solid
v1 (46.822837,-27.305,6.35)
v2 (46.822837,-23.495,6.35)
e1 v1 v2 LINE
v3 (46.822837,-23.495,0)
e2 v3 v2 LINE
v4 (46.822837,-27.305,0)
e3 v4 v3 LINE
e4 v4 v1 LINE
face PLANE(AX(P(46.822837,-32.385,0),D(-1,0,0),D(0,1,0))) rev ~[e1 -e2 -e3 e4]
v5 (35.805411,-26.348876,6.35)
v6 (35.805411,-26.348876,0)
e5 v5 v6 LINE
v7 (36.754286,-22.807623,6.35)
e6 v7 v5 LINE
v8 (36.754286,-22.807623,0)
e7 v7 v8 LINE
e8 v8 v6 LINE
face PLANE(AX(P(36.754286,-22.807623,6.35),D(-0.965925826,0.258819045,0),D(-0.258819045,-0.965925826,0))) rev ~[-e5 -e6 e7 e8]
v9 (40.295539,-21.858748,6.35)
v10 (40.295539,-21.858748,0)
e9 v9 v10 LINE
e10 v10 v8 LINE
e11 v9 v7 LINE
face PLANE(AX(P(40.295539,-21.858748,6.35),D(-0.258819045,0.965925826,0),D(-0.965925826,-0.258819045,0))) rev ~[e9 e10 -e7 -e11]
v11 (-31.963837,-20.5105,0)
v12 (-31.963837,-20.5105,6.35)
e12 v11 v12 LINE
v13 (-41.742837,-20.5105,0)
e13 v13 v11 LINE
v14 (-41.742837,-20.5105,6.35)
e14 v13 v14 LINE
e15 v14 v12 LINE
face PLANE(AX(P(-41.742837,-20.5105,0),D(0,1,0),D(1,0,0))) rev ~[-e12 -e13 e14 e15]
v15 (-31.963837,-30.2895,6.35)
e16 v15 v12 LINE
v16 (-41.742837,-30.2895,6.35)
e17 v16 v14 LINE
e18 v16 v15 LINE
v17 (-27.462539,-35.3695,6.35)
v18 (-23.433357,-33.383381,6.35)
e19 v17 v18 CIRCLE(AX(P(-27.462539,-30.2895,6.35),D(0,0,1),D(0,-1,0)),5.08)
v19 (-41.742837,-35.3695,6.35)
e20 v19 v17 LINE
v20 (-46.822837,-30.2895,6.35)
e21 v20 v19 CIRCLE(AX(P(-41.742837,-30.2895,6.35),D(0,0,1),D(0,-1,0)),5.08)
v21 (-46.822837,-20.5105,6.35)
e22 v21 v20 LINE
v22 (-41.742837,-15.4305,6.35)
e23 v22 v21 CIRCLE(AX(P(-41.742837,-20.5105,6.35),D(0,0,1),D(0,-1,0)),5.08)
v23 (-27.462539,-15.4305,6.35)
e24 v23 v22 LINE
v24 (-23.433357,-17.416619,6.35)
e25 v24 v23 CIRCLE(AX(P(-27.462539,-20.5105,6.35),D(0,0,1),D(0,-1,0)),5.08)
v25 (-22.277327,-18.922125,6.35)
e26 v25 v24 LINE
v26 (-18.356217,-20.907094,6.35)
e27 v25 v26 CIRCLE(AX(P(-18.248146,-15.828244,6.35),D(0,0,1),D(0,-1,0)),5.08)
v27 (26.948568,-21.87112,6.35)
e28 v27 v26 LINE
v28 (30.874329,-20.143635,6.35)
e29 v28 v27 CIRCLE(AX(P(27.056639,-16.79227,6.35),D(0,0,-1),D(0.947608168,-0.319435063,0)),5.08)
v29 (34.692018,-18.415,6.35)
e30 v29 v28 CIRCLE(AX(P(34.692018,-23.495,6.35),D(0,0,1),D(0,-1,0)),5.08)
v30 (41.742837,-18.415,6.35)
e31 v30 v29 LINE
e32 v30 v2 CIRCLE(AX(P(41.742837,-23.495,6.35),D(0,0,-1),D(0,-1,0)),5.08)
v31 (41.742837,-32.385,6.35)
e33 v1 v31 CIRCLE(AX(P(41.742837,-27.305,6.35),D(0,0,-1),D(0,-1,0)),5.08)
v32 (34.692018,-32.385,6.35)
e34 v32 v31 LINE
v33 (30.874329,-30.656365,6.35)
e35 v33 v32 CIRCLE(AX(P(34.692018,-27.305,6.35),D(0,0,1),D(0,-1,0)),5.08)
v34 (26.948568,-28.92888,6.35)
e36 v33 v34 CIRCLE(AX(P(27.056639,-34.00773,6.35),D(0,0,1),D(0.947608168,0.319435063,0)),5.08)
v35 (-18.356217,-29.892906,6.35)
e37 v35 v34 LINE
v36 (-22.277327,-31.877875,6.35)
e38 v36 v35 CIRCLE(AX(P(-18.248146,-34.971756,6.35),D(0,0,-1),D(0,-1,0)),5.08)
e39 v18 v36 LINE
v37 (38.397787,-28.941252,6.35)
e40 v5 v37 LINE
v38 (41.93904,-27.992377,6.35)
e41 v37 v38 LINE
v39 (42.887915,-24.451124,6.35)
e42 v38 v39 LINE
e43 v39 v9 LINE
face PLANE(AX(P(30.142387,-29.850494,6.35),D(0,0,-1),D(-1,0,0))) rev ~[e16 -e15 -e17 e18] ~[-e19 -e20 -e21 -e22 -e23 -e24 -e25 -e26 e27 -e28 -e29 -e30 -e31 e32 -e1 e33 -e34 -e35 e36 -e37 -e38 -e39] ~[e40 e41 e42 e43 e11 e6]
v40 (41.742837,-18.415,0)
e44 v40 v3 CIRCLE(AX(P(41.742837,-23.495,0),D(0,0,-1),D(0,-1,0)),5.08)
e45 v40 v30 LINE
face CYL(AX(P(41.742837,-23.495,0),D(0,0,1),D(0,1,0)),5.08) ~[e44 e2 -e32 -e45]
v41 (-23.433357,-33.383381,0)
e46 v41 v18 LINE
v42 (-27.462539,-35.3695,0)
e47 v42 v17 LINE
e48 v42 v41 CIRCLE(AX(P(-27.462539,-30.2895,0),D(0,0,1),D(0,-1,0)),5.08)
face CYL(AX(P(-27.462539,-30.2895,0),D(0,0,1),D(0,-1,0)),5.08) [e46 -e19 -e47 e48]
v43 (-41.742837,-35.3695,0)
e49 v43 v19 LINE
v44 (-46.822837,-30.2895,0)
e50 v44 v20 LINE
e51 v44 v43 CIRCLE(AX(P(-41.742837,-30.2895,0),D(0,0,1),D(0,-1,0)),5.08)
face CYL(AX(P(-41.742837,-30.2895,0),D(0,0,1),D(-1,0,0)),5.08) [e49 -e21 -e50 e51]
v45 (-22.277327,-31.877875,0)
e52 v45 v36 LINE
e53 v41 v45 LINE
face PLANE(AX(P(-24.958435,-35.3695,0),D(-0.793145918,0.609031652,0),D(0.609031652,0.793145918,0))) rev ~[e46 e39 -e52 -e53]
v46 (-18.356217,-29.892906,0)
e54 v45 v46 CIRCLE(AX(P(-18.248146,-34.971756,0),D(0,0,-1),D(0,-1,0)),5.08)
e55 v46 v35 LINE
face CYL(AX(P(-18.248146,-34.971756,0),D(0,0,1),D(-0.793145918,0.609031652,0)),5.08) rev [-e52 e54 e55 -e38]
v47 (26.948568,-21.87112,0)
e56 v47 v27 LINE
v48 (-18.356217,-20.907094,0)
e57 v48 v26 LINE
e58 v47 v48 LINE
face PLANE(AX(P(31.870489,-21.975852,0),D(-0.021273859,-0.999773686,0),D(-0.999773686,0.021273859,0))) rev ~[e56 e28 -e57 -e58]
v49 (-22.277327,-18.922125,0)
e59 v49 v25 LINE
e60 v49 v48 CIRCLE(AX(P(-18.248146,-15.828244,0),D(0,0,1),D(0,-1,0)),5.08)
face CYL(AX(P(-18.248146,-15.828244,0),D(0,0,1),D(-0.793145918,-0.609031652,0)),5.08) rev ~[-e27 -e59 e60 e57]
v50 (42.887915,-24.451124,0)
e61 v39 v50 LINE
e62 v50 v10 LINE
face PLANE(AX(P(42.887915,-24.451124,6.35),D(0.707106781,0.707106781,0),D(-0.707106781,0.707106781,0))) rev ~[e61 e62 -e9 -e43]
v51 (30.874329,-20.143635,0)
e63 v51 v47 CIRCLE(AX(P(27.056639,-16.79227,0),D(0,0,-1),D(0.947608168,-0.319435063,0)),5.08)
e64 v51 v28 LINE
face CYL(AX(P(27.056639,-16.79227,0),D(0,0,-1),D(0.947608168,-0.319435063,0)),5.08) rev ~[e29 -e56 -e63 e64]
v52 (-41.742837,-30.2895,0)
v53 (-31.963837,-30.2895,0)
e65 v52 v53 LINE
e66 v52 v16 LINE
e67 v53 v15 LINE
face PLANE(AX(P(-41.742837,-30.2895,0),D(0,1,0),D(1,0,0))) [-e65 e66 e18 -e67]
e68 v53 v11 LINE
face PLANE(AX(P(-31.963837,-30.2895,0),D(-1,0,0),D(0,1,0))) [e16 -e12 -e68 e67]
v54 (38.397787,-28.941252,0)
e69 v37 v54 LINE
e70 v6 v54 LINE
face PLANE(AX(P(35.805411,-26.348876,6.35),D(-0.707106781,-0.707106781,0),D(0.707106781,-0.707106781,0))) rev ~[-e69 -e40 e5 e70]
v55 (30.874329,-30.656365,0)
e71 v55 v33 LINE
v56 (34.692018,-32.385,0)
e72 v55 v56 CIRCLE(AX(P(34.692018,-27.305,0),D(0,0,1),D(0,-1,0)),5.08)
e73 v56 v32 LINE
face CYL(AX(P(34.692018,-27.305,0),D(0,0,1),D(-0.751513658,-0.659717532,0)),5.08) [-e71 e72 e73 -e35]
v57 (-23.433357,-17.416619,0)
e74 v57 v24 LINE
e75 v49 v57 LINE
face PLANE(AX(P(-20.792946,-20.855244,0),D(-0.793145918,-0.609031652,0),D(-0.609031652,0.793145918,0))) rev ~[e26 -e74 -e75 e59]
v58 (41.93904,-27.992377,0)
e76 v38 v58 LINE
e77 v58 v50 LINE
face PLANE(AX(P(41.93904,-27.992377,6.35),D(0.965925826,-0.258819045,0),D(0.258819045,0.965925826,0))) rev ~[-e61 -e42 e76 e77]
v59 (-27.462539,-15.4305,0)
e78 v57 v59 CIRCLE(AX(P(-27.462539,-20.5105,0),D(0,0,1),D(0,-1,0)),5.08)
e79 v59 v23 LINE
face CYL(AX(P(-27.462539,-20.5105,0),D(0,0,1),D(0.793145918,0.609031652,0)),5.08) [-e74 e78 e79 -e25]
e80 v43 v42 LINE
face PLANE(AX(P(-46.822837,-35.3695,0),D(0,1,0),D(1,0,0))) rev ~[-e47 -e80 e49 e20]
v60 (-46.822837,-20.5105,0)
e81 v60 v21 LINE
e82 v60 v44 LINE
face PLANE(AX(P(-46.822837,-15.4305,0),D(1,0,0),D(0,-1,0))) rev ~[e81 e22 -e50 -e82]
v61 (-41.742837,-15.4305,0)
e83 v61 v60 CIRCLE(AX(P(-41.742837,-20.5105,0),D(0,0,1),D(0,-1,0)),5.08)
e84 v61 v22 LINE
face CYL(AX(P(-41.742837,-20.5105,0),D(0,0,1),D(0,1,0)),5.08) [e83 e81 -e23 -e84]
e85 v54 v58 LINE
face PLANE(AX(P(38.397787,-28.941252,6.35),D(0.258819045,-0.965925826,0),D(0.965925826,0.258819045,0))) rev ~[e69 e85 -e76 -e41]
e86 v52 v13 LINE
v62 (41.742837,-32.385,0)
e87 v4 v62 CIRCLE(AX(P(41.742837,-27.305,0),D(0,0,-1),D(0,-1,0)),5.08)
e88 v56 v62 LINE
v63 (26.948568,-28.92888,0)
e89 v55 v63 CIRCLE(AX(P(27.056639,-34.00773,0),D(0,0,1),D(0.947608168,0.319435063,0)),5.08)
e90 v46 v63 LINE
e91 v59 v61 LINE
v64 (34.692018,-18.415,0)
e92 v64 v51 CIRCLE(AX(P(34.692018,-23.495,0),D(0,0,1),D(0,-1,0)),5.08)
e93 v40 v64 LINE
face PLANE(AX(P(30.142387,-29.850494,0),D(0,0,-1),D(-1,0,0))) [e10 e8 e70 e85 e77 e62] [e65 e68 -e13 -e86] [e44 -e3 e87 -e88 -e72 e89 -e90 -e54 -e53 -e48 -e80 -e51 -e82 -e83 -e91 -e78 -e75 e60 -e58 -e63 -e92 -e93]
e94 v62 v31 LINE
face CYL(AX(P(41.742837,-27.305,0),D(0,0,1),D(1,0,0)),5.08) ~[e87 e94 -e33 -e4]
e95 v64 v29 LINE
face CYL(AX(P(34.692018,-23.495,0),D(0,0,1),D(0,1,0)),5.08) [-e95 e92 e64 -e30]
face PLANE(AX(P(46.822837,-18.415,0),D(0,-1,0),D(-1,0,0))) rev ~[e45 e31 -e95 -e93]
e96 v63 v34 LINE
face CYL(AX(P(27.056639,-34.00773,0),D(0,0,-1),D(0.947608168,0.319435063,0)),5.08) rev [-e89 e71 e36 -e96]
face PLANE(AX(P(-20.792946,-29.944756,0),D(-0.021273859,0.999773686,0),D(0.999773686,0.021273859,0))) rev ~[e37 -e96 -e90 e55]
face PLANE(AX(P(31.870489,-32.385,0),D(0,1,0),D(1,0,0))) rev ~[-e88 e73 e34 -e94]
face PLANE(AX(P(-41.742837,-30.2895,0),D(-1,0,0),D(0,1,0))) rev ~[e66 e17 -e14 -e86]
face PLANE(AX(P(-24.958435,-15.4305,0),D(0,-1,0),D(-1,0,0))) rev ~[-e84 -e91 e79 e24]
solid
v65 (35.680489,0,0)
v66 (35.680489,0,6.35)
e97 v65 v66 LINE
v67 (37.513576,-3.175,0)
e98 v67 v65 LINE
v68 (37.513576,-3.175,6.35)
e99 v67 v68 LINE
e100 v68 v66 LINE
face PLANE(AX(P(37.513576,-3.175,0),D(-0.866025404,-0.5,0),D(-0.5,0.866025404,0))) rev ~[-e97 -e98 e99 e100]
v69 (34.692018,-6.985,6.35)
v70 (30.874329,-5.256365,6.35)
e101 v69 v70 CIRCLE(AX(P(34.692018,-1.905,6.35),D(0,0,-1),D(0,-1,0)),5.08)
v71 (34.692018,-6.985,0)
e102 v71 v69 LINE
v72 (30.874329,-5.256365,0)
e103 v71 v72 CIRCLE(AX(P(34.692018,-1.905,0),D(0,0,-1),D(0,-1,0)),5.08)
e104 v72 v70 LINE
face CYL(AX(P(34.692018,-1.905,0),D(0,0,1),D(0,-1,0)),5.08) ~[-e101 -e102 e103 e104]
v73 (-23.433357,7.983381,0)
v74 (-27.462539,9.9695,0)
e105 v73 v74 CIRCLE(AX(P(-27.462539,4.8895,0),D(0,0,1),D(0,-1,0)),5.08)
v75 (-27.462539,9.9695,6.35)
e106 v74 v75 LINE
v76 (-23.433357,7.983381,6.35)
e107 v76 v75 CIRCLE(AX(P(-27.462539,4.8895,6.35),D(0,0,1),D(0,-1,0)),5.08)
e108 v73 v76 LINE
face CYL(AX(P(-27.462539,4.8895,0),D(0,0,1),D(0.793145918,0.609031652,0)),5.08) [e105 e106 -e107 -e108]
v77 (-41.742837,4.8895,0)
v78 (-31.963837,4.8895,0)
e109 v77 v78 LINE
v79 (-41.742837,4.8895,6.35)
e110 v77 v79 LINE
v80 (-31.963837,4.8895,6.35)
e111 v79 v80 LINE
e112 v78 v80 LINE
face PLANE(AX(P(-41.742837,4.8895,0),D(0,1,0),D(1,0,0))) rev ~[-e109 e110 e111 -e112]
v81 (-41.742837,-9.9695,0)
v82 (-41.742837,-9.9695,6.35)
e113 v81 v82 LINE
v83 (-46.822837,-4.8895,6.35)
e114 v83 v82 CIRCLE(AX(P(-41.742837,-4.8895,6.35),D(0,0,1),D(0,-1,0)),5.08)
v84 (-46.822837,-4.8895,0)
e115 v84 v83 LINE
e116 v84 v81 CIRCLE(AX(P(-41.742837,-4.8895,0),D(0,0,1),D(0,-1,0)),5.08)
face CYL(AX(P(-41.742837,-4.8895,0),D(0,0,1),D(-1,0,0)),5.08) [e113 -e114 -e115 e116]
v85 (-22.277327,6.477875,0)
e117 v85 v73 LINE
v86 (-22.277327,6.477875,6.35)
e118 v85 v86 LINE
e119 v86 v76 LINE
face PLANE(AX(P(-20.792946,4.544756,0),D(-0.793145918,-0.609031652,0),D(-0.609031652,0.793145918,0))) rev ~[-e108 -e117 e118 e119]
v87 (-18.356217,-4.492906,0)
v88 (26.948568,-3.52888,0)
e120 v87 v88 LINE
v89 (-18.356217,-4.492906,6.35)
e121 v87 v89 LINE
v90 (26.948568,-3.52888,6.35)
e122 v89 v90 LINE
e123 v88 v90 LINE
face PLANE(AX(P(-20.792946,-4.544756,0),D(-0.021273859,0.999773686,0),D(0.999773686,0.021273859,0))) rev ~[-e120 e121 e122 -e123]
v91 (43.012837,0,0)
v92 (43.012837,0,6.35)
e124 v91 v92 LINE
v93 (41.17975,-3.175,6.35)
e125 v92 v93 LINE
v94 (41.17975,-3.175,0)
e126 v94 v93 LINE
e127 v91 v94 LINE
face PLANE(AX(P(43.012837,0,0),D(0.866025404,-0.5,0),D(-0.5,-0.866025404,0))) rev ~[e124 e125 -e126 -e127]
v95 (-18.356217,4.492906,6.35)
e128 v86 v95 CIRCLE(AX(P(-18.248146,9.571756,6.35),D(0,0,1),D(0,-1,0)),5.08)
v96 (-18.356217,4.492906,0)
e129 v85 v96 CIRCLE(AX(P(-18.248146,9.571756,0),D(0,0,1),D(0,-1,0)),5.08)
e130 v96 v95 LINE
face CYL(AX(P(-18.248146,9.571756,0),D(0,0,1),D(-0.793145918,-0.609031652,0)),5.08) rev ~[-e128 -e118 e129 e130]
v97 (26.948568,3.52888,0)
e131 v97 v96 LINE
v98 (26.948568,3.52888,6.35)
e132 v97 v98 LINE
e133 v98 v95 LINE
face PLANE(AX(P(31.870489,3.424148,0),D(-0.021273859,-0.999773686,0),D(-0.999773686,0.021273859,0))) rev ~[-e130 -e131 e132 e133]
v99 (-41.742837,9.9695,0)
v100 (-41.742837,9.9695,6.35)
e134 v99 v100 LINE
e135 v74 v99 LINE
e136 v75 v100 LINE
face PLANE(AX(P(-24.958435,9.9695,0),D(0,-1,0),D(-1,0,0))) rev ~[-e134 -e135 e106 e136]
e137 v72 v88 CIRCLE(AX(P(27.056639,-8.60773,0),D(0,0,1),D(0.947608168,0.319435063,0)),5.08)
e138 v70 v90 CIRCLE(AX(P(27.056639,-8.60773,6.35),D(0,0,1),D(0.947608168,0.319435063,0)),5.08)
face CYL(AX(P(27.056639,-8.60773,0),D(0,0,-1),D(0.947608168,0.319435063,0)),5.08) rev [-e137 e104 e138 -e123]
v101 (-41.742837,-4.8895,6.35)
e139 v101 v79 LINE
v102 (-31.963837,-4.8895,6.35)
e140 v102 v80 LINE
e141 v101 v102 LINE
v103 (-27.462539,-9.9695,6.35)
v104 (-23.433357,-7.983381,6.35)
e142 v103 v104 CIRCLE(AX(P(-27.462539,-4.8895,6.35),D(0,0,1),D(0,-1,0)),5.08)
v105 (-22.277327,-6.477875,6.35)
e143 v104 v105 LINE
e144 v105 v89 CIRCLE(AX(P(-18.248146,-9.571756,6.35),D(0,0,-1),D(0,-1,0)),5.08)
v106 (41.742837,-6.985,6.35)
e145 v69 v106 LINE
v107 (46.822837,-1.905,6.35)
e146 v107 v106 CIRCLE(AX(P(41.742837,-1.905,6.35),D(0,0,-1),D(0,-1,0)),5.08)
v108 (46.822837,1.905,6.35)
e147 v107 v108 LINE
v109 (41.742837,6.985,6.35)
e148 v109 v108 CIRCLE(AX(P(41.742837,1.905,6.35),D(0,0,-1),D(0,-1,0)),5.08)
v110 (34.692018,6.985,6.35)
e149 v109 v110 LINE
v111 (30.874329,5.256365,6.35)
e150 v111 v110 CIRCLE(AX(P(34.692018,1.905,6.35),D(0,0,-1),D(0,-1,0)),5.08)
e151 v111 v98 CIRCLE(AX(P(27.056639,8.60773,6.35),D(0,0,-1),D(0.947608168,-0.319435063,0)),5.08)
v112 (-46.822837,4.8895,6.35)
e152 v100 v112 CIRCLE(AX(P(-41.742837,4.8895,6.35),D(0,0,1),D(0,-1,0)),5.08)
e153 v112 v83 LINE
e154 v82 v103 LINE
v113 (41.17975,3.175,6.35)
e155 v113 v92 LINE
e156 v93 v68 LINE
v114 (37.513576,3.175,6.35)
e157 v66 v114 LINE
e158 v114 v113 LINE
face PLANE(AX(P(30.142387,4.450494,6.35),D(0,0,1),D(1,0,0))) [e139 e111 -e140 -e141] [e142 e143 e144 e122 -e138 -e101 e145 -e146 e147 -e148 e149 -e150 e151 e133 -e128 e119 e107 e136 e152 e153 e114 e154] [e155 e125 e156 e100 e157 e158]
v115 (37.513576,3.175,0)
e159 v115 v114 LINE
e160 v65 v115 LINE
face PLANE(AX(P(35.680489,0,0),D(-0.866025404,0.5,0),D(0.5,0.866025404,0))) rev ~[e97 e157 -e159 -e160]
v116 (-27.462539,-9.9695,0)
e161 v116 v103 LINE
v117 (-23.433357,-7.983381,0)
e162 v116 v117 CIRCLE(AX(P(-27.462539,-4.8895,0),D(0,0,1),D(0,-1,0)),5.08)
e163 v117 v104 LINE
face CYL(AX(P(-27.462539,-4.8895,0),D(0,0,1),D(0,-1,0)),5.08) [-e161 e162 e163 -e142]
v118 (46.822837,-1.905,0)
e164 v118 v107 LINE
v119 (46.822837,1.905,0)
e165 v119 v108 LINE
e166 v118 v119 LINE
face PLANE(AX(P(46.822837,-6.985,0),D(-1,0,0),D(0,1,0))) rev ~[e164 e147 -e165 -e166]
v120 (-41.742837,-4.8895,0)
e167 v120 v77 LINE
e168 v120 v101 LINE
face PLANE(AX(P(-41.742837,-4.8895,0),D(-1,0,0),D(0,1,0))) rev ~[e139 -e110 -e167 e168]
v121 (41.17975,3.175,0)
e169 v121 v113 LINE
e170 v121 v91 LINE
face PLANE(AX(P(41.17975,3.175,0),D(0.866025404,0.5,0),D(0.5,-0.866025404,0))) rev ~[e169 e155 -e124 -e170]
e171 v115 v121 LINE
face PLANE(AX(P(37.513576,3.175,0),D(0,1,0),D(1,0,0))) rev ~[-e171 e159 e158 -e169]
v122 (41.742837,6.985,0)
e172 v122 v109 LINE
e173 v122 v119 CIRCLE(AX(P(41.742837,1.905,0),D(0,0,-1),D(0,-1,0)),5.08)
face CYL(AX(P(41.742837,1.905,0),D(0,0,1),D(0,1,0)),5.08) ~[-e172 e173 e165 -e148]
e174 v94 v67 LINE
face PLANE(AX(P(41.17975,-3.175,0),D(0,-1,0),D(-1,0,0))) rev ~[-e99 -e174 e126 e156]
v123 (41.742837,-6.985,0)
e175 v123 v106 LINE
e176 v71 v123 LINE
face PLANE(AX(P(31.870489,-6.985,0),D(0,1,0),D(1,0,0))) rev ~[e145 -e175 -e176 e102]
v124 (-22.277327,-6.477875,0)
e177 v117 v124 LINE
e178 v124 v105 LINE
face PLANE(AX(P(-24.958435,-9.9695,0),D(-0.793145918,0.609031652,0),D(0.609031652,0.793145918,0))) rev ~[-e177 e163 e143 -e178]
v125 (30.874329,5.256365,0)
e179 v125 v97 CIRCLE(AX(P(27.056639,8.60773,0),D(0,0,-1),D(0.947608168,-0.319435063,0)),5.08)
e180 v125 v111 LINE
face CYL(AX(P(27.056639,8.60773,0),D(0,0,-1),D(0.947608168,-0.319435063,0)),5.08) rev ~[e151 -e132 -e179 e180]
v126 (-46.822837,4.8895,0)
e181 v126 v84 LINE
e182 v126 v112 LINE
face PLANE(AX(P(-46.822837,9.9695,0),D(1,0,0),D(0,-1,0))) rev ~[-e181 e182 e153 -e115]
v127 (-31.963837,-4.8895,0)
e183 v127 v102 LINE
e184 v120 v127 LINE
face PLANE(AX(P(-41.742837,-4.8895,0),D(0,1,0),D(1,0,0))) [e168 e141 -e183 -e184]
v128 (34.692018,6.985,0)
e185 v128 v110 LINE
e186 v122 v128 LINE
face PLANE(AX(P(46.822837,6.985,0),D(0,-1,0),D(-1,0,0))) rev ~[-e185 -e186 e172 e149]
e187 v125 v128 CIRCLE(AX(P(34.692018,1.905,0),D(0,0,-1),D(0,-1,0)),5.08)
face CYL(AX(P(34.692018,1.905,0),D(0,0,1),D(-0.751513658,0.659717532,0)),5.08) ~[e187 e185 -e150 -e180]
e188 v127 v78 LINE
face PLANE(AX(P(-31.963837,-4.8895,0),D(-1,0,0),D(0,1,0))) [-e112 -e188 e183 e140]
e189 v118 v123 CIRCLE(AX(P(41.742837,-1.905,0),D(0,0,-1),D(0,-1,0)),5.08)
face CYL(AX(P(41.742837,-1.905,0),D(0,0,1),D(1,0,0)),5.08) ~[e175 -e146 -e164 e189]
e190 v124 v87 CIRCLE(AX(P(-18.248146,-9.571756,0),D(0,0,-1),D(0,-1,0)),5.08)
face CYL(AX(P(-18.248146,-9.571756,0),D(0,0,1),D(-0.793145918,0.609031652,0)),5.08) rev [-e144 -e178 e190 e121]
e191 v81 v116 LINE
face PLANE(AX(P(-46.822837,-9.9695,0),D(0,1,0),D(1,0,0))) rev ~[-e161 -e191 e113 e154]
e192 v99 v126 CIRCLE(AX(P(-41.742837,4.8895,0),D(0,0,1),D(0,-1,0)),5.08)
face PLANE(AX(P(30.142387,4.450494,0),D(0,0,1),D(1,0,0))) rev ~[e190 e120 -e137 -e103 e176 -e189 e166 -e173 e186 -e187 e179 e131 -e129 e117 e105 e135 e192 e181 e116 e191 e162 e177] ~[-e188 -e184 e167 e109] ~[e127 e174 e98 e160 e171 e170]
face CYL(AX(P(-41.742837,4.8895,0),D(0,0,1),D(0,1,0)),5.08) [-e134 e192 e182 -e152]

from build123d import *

# Parameters (mm, degrees)
F0_W         = 9.779
F0_H         = 9.779
F1_DEPTH     = 6.35
F2_R         = 5.08
F7_DEPTH     = 6.35
F9_DEPTH     = 25.4
F10_T1_DEPTH = 6.35
F11_R        = 5.08
F12_T1_DEPTH = 6.35
F13_R        = 5.08


# Not quite as in the source:
# - a fillet or chamfer that OpenCascade refuses, or shapes differently, is made with other operations: its cross-section is extruded or revolved along the edge and cut away or added


with BuildPart() as f1:
    # F0 (on Top) → F1 (new body)
    with BuildSketch(Plane.XY):
        Polygon((-20.7929461649, 4.5447559669), (-24.958435446, 9.9695), (-46.8228371047, 9.9695), (-46.8228371047, -9.9695), (-24.958435446, -9.9695), (-20.7929461649, -4.5447559669), (31.870488686, -3.4241478445), (31.870488686, -6.985), (46.8228371047, -6.985), (46.8228371047, 6.985), (31.870488686, 6.985), (31.870488686, 3.4241478445), align=None)
        with Locations((-36.8533371047, 0)):
            Rectangle(F0_W, F0_H, mode=Mode.SUBTRACT)
        Polygon((41.17975, -3.175), (37.5135757906, -3.175), (35.680488686, 0), (37.5135757906, 3.175), (41.17975, 3.175), (43.0128371047, 0), align=None, mode=Mode.SUBTRACT)
    extrude(amount=F1_DEPTH)

    # F2
    f2_edges = [f1.edges().sort_by_distance(p)[0] for p in [
        (-46.822837, -9.9695, 3.175),
        (-46.822837, 9.9695, 3.175),
        (46.822837, 6.985, 3.175),
        (-20.792946, 4.544756, 3.175),
        (-24.958435, 9.9695, 3.175),
        (-24.958435, -9.9695, 3.175),
        (-20.792946, -4.544756, 3.175),
        (46.822837, -6.985, 3.175),
    ]]
    fillet(f2_edges, radius=F2_R)


with BuildPart() as f5_1:
    # F5: copy of F1
    add(f1.part.moved(Location((0, -25.4, 0))))

    # F6 (on Top) → F7 (join, through all)
    with BuildSketch(Plane.XY):
        Polygon((41.17975, -22.225), (37.5135757906, -22.225), (35.680488686, -25.4), (37.5135757906, -28.575), (41.17975, -28.575), (43.0128371047, -25.4), align=None)
    extrude(amount=F7_DEPTH)

    # F8 (on face) → F9 (cut)
    with BuildSketch(Plane.XY.offset(6.35)):
        Polygon((40.2955386034, -21.8587476475), (36.7542862509, -22.8076233556), (35.8054105428, -26.348875708), (38.3977871873, -28.9412523525), (41.9390395398, -27.9923766444), (42.8879152478, -24.451124292), align=None)
    extrude(amount=-F9_DEPTH, mode=Mode.SUBTRACT)

    # F12: fillet of radius 5.08 on 2 edges, made by hand

    # F12_s2 → F12_t1 (join)
    with BuildSketch(Plane.XY):
        with BuildLine():
            ThreePointArc((31.870488686, -32.385), (29.9759334624, -29.8503125373), (26.9485679852, -28.9288797962))
            Line((26.9485679852, -28.9288797962), (31.870488686, -28.8241478445))
            Line((31.870488686, -28.8241478445), (31.870488686, -32.385))
        make_face()
        with BuildLine():
            ThreePointArc((31.870488686, -18.415), (29.9759334624, -20.9496874627), (26.9485679852, -21.8711202038))
            Line((26.9485679852, -21.8711202038), (31.870488686, -21.9758521555))
            Line((31.870488686, -21.9758521555), (31.870488686, -18.415))
        make_face()
    extrude(amount=F12_T1_DEPTH)

    # F13
    f13_edges = [f5_1.edges().sort_by_distance(p)[0] for p in [
        (31.870489, -18.415, 3.175),
        (31.870489, -32.385, 3.175),
    ]]
    fillet(f13_edges, radius=F13_R)


with BuildPart() as f1_1:
    add(f1.part)

    # F10: fillet of radius 5.08 on 2 edges, made by hand

    # F10_s2 → F10_t1 (join)
    with BuildSketch(Plane.XY):
        with BuildLine():
            ThreePointArc((31.870488686, 6.985), (29.9759334624, 4.4503125373), (26.9485679852, 3.5288797962))
            Line((26.9485679852, 3.5288797962), (31.870488686, 3.4241478445))
            Line((31.870488686, 3.4241478445), (31.870488686, 6.985))
        make_face()
        with BuildLine():
            ThreePointArc((31.870488686, -6.985), (29.9759334624, -4.4503125373), (26.9485679852, -3.5288797962))
            Line((26.9485679852, -3.5288797962), (31.870488686, -3.4241478445))
            Line((31.870488686, -3.4241478445), (31.870488686, -6.985))
        make_face()
    extrude(amount=F10_T1_DEPTH)

    # F11
    f11_edges = [f1_1.edges().sort_by_distance(p)[0] for p in [
        (31.870489, -6.985, 3.175),
        (31.870489, 6.985, 3.175),
    ]]
    fillet(f11_edges, radius=F11_R)


solid = Compound([f5_1.part, f1_1.part])
